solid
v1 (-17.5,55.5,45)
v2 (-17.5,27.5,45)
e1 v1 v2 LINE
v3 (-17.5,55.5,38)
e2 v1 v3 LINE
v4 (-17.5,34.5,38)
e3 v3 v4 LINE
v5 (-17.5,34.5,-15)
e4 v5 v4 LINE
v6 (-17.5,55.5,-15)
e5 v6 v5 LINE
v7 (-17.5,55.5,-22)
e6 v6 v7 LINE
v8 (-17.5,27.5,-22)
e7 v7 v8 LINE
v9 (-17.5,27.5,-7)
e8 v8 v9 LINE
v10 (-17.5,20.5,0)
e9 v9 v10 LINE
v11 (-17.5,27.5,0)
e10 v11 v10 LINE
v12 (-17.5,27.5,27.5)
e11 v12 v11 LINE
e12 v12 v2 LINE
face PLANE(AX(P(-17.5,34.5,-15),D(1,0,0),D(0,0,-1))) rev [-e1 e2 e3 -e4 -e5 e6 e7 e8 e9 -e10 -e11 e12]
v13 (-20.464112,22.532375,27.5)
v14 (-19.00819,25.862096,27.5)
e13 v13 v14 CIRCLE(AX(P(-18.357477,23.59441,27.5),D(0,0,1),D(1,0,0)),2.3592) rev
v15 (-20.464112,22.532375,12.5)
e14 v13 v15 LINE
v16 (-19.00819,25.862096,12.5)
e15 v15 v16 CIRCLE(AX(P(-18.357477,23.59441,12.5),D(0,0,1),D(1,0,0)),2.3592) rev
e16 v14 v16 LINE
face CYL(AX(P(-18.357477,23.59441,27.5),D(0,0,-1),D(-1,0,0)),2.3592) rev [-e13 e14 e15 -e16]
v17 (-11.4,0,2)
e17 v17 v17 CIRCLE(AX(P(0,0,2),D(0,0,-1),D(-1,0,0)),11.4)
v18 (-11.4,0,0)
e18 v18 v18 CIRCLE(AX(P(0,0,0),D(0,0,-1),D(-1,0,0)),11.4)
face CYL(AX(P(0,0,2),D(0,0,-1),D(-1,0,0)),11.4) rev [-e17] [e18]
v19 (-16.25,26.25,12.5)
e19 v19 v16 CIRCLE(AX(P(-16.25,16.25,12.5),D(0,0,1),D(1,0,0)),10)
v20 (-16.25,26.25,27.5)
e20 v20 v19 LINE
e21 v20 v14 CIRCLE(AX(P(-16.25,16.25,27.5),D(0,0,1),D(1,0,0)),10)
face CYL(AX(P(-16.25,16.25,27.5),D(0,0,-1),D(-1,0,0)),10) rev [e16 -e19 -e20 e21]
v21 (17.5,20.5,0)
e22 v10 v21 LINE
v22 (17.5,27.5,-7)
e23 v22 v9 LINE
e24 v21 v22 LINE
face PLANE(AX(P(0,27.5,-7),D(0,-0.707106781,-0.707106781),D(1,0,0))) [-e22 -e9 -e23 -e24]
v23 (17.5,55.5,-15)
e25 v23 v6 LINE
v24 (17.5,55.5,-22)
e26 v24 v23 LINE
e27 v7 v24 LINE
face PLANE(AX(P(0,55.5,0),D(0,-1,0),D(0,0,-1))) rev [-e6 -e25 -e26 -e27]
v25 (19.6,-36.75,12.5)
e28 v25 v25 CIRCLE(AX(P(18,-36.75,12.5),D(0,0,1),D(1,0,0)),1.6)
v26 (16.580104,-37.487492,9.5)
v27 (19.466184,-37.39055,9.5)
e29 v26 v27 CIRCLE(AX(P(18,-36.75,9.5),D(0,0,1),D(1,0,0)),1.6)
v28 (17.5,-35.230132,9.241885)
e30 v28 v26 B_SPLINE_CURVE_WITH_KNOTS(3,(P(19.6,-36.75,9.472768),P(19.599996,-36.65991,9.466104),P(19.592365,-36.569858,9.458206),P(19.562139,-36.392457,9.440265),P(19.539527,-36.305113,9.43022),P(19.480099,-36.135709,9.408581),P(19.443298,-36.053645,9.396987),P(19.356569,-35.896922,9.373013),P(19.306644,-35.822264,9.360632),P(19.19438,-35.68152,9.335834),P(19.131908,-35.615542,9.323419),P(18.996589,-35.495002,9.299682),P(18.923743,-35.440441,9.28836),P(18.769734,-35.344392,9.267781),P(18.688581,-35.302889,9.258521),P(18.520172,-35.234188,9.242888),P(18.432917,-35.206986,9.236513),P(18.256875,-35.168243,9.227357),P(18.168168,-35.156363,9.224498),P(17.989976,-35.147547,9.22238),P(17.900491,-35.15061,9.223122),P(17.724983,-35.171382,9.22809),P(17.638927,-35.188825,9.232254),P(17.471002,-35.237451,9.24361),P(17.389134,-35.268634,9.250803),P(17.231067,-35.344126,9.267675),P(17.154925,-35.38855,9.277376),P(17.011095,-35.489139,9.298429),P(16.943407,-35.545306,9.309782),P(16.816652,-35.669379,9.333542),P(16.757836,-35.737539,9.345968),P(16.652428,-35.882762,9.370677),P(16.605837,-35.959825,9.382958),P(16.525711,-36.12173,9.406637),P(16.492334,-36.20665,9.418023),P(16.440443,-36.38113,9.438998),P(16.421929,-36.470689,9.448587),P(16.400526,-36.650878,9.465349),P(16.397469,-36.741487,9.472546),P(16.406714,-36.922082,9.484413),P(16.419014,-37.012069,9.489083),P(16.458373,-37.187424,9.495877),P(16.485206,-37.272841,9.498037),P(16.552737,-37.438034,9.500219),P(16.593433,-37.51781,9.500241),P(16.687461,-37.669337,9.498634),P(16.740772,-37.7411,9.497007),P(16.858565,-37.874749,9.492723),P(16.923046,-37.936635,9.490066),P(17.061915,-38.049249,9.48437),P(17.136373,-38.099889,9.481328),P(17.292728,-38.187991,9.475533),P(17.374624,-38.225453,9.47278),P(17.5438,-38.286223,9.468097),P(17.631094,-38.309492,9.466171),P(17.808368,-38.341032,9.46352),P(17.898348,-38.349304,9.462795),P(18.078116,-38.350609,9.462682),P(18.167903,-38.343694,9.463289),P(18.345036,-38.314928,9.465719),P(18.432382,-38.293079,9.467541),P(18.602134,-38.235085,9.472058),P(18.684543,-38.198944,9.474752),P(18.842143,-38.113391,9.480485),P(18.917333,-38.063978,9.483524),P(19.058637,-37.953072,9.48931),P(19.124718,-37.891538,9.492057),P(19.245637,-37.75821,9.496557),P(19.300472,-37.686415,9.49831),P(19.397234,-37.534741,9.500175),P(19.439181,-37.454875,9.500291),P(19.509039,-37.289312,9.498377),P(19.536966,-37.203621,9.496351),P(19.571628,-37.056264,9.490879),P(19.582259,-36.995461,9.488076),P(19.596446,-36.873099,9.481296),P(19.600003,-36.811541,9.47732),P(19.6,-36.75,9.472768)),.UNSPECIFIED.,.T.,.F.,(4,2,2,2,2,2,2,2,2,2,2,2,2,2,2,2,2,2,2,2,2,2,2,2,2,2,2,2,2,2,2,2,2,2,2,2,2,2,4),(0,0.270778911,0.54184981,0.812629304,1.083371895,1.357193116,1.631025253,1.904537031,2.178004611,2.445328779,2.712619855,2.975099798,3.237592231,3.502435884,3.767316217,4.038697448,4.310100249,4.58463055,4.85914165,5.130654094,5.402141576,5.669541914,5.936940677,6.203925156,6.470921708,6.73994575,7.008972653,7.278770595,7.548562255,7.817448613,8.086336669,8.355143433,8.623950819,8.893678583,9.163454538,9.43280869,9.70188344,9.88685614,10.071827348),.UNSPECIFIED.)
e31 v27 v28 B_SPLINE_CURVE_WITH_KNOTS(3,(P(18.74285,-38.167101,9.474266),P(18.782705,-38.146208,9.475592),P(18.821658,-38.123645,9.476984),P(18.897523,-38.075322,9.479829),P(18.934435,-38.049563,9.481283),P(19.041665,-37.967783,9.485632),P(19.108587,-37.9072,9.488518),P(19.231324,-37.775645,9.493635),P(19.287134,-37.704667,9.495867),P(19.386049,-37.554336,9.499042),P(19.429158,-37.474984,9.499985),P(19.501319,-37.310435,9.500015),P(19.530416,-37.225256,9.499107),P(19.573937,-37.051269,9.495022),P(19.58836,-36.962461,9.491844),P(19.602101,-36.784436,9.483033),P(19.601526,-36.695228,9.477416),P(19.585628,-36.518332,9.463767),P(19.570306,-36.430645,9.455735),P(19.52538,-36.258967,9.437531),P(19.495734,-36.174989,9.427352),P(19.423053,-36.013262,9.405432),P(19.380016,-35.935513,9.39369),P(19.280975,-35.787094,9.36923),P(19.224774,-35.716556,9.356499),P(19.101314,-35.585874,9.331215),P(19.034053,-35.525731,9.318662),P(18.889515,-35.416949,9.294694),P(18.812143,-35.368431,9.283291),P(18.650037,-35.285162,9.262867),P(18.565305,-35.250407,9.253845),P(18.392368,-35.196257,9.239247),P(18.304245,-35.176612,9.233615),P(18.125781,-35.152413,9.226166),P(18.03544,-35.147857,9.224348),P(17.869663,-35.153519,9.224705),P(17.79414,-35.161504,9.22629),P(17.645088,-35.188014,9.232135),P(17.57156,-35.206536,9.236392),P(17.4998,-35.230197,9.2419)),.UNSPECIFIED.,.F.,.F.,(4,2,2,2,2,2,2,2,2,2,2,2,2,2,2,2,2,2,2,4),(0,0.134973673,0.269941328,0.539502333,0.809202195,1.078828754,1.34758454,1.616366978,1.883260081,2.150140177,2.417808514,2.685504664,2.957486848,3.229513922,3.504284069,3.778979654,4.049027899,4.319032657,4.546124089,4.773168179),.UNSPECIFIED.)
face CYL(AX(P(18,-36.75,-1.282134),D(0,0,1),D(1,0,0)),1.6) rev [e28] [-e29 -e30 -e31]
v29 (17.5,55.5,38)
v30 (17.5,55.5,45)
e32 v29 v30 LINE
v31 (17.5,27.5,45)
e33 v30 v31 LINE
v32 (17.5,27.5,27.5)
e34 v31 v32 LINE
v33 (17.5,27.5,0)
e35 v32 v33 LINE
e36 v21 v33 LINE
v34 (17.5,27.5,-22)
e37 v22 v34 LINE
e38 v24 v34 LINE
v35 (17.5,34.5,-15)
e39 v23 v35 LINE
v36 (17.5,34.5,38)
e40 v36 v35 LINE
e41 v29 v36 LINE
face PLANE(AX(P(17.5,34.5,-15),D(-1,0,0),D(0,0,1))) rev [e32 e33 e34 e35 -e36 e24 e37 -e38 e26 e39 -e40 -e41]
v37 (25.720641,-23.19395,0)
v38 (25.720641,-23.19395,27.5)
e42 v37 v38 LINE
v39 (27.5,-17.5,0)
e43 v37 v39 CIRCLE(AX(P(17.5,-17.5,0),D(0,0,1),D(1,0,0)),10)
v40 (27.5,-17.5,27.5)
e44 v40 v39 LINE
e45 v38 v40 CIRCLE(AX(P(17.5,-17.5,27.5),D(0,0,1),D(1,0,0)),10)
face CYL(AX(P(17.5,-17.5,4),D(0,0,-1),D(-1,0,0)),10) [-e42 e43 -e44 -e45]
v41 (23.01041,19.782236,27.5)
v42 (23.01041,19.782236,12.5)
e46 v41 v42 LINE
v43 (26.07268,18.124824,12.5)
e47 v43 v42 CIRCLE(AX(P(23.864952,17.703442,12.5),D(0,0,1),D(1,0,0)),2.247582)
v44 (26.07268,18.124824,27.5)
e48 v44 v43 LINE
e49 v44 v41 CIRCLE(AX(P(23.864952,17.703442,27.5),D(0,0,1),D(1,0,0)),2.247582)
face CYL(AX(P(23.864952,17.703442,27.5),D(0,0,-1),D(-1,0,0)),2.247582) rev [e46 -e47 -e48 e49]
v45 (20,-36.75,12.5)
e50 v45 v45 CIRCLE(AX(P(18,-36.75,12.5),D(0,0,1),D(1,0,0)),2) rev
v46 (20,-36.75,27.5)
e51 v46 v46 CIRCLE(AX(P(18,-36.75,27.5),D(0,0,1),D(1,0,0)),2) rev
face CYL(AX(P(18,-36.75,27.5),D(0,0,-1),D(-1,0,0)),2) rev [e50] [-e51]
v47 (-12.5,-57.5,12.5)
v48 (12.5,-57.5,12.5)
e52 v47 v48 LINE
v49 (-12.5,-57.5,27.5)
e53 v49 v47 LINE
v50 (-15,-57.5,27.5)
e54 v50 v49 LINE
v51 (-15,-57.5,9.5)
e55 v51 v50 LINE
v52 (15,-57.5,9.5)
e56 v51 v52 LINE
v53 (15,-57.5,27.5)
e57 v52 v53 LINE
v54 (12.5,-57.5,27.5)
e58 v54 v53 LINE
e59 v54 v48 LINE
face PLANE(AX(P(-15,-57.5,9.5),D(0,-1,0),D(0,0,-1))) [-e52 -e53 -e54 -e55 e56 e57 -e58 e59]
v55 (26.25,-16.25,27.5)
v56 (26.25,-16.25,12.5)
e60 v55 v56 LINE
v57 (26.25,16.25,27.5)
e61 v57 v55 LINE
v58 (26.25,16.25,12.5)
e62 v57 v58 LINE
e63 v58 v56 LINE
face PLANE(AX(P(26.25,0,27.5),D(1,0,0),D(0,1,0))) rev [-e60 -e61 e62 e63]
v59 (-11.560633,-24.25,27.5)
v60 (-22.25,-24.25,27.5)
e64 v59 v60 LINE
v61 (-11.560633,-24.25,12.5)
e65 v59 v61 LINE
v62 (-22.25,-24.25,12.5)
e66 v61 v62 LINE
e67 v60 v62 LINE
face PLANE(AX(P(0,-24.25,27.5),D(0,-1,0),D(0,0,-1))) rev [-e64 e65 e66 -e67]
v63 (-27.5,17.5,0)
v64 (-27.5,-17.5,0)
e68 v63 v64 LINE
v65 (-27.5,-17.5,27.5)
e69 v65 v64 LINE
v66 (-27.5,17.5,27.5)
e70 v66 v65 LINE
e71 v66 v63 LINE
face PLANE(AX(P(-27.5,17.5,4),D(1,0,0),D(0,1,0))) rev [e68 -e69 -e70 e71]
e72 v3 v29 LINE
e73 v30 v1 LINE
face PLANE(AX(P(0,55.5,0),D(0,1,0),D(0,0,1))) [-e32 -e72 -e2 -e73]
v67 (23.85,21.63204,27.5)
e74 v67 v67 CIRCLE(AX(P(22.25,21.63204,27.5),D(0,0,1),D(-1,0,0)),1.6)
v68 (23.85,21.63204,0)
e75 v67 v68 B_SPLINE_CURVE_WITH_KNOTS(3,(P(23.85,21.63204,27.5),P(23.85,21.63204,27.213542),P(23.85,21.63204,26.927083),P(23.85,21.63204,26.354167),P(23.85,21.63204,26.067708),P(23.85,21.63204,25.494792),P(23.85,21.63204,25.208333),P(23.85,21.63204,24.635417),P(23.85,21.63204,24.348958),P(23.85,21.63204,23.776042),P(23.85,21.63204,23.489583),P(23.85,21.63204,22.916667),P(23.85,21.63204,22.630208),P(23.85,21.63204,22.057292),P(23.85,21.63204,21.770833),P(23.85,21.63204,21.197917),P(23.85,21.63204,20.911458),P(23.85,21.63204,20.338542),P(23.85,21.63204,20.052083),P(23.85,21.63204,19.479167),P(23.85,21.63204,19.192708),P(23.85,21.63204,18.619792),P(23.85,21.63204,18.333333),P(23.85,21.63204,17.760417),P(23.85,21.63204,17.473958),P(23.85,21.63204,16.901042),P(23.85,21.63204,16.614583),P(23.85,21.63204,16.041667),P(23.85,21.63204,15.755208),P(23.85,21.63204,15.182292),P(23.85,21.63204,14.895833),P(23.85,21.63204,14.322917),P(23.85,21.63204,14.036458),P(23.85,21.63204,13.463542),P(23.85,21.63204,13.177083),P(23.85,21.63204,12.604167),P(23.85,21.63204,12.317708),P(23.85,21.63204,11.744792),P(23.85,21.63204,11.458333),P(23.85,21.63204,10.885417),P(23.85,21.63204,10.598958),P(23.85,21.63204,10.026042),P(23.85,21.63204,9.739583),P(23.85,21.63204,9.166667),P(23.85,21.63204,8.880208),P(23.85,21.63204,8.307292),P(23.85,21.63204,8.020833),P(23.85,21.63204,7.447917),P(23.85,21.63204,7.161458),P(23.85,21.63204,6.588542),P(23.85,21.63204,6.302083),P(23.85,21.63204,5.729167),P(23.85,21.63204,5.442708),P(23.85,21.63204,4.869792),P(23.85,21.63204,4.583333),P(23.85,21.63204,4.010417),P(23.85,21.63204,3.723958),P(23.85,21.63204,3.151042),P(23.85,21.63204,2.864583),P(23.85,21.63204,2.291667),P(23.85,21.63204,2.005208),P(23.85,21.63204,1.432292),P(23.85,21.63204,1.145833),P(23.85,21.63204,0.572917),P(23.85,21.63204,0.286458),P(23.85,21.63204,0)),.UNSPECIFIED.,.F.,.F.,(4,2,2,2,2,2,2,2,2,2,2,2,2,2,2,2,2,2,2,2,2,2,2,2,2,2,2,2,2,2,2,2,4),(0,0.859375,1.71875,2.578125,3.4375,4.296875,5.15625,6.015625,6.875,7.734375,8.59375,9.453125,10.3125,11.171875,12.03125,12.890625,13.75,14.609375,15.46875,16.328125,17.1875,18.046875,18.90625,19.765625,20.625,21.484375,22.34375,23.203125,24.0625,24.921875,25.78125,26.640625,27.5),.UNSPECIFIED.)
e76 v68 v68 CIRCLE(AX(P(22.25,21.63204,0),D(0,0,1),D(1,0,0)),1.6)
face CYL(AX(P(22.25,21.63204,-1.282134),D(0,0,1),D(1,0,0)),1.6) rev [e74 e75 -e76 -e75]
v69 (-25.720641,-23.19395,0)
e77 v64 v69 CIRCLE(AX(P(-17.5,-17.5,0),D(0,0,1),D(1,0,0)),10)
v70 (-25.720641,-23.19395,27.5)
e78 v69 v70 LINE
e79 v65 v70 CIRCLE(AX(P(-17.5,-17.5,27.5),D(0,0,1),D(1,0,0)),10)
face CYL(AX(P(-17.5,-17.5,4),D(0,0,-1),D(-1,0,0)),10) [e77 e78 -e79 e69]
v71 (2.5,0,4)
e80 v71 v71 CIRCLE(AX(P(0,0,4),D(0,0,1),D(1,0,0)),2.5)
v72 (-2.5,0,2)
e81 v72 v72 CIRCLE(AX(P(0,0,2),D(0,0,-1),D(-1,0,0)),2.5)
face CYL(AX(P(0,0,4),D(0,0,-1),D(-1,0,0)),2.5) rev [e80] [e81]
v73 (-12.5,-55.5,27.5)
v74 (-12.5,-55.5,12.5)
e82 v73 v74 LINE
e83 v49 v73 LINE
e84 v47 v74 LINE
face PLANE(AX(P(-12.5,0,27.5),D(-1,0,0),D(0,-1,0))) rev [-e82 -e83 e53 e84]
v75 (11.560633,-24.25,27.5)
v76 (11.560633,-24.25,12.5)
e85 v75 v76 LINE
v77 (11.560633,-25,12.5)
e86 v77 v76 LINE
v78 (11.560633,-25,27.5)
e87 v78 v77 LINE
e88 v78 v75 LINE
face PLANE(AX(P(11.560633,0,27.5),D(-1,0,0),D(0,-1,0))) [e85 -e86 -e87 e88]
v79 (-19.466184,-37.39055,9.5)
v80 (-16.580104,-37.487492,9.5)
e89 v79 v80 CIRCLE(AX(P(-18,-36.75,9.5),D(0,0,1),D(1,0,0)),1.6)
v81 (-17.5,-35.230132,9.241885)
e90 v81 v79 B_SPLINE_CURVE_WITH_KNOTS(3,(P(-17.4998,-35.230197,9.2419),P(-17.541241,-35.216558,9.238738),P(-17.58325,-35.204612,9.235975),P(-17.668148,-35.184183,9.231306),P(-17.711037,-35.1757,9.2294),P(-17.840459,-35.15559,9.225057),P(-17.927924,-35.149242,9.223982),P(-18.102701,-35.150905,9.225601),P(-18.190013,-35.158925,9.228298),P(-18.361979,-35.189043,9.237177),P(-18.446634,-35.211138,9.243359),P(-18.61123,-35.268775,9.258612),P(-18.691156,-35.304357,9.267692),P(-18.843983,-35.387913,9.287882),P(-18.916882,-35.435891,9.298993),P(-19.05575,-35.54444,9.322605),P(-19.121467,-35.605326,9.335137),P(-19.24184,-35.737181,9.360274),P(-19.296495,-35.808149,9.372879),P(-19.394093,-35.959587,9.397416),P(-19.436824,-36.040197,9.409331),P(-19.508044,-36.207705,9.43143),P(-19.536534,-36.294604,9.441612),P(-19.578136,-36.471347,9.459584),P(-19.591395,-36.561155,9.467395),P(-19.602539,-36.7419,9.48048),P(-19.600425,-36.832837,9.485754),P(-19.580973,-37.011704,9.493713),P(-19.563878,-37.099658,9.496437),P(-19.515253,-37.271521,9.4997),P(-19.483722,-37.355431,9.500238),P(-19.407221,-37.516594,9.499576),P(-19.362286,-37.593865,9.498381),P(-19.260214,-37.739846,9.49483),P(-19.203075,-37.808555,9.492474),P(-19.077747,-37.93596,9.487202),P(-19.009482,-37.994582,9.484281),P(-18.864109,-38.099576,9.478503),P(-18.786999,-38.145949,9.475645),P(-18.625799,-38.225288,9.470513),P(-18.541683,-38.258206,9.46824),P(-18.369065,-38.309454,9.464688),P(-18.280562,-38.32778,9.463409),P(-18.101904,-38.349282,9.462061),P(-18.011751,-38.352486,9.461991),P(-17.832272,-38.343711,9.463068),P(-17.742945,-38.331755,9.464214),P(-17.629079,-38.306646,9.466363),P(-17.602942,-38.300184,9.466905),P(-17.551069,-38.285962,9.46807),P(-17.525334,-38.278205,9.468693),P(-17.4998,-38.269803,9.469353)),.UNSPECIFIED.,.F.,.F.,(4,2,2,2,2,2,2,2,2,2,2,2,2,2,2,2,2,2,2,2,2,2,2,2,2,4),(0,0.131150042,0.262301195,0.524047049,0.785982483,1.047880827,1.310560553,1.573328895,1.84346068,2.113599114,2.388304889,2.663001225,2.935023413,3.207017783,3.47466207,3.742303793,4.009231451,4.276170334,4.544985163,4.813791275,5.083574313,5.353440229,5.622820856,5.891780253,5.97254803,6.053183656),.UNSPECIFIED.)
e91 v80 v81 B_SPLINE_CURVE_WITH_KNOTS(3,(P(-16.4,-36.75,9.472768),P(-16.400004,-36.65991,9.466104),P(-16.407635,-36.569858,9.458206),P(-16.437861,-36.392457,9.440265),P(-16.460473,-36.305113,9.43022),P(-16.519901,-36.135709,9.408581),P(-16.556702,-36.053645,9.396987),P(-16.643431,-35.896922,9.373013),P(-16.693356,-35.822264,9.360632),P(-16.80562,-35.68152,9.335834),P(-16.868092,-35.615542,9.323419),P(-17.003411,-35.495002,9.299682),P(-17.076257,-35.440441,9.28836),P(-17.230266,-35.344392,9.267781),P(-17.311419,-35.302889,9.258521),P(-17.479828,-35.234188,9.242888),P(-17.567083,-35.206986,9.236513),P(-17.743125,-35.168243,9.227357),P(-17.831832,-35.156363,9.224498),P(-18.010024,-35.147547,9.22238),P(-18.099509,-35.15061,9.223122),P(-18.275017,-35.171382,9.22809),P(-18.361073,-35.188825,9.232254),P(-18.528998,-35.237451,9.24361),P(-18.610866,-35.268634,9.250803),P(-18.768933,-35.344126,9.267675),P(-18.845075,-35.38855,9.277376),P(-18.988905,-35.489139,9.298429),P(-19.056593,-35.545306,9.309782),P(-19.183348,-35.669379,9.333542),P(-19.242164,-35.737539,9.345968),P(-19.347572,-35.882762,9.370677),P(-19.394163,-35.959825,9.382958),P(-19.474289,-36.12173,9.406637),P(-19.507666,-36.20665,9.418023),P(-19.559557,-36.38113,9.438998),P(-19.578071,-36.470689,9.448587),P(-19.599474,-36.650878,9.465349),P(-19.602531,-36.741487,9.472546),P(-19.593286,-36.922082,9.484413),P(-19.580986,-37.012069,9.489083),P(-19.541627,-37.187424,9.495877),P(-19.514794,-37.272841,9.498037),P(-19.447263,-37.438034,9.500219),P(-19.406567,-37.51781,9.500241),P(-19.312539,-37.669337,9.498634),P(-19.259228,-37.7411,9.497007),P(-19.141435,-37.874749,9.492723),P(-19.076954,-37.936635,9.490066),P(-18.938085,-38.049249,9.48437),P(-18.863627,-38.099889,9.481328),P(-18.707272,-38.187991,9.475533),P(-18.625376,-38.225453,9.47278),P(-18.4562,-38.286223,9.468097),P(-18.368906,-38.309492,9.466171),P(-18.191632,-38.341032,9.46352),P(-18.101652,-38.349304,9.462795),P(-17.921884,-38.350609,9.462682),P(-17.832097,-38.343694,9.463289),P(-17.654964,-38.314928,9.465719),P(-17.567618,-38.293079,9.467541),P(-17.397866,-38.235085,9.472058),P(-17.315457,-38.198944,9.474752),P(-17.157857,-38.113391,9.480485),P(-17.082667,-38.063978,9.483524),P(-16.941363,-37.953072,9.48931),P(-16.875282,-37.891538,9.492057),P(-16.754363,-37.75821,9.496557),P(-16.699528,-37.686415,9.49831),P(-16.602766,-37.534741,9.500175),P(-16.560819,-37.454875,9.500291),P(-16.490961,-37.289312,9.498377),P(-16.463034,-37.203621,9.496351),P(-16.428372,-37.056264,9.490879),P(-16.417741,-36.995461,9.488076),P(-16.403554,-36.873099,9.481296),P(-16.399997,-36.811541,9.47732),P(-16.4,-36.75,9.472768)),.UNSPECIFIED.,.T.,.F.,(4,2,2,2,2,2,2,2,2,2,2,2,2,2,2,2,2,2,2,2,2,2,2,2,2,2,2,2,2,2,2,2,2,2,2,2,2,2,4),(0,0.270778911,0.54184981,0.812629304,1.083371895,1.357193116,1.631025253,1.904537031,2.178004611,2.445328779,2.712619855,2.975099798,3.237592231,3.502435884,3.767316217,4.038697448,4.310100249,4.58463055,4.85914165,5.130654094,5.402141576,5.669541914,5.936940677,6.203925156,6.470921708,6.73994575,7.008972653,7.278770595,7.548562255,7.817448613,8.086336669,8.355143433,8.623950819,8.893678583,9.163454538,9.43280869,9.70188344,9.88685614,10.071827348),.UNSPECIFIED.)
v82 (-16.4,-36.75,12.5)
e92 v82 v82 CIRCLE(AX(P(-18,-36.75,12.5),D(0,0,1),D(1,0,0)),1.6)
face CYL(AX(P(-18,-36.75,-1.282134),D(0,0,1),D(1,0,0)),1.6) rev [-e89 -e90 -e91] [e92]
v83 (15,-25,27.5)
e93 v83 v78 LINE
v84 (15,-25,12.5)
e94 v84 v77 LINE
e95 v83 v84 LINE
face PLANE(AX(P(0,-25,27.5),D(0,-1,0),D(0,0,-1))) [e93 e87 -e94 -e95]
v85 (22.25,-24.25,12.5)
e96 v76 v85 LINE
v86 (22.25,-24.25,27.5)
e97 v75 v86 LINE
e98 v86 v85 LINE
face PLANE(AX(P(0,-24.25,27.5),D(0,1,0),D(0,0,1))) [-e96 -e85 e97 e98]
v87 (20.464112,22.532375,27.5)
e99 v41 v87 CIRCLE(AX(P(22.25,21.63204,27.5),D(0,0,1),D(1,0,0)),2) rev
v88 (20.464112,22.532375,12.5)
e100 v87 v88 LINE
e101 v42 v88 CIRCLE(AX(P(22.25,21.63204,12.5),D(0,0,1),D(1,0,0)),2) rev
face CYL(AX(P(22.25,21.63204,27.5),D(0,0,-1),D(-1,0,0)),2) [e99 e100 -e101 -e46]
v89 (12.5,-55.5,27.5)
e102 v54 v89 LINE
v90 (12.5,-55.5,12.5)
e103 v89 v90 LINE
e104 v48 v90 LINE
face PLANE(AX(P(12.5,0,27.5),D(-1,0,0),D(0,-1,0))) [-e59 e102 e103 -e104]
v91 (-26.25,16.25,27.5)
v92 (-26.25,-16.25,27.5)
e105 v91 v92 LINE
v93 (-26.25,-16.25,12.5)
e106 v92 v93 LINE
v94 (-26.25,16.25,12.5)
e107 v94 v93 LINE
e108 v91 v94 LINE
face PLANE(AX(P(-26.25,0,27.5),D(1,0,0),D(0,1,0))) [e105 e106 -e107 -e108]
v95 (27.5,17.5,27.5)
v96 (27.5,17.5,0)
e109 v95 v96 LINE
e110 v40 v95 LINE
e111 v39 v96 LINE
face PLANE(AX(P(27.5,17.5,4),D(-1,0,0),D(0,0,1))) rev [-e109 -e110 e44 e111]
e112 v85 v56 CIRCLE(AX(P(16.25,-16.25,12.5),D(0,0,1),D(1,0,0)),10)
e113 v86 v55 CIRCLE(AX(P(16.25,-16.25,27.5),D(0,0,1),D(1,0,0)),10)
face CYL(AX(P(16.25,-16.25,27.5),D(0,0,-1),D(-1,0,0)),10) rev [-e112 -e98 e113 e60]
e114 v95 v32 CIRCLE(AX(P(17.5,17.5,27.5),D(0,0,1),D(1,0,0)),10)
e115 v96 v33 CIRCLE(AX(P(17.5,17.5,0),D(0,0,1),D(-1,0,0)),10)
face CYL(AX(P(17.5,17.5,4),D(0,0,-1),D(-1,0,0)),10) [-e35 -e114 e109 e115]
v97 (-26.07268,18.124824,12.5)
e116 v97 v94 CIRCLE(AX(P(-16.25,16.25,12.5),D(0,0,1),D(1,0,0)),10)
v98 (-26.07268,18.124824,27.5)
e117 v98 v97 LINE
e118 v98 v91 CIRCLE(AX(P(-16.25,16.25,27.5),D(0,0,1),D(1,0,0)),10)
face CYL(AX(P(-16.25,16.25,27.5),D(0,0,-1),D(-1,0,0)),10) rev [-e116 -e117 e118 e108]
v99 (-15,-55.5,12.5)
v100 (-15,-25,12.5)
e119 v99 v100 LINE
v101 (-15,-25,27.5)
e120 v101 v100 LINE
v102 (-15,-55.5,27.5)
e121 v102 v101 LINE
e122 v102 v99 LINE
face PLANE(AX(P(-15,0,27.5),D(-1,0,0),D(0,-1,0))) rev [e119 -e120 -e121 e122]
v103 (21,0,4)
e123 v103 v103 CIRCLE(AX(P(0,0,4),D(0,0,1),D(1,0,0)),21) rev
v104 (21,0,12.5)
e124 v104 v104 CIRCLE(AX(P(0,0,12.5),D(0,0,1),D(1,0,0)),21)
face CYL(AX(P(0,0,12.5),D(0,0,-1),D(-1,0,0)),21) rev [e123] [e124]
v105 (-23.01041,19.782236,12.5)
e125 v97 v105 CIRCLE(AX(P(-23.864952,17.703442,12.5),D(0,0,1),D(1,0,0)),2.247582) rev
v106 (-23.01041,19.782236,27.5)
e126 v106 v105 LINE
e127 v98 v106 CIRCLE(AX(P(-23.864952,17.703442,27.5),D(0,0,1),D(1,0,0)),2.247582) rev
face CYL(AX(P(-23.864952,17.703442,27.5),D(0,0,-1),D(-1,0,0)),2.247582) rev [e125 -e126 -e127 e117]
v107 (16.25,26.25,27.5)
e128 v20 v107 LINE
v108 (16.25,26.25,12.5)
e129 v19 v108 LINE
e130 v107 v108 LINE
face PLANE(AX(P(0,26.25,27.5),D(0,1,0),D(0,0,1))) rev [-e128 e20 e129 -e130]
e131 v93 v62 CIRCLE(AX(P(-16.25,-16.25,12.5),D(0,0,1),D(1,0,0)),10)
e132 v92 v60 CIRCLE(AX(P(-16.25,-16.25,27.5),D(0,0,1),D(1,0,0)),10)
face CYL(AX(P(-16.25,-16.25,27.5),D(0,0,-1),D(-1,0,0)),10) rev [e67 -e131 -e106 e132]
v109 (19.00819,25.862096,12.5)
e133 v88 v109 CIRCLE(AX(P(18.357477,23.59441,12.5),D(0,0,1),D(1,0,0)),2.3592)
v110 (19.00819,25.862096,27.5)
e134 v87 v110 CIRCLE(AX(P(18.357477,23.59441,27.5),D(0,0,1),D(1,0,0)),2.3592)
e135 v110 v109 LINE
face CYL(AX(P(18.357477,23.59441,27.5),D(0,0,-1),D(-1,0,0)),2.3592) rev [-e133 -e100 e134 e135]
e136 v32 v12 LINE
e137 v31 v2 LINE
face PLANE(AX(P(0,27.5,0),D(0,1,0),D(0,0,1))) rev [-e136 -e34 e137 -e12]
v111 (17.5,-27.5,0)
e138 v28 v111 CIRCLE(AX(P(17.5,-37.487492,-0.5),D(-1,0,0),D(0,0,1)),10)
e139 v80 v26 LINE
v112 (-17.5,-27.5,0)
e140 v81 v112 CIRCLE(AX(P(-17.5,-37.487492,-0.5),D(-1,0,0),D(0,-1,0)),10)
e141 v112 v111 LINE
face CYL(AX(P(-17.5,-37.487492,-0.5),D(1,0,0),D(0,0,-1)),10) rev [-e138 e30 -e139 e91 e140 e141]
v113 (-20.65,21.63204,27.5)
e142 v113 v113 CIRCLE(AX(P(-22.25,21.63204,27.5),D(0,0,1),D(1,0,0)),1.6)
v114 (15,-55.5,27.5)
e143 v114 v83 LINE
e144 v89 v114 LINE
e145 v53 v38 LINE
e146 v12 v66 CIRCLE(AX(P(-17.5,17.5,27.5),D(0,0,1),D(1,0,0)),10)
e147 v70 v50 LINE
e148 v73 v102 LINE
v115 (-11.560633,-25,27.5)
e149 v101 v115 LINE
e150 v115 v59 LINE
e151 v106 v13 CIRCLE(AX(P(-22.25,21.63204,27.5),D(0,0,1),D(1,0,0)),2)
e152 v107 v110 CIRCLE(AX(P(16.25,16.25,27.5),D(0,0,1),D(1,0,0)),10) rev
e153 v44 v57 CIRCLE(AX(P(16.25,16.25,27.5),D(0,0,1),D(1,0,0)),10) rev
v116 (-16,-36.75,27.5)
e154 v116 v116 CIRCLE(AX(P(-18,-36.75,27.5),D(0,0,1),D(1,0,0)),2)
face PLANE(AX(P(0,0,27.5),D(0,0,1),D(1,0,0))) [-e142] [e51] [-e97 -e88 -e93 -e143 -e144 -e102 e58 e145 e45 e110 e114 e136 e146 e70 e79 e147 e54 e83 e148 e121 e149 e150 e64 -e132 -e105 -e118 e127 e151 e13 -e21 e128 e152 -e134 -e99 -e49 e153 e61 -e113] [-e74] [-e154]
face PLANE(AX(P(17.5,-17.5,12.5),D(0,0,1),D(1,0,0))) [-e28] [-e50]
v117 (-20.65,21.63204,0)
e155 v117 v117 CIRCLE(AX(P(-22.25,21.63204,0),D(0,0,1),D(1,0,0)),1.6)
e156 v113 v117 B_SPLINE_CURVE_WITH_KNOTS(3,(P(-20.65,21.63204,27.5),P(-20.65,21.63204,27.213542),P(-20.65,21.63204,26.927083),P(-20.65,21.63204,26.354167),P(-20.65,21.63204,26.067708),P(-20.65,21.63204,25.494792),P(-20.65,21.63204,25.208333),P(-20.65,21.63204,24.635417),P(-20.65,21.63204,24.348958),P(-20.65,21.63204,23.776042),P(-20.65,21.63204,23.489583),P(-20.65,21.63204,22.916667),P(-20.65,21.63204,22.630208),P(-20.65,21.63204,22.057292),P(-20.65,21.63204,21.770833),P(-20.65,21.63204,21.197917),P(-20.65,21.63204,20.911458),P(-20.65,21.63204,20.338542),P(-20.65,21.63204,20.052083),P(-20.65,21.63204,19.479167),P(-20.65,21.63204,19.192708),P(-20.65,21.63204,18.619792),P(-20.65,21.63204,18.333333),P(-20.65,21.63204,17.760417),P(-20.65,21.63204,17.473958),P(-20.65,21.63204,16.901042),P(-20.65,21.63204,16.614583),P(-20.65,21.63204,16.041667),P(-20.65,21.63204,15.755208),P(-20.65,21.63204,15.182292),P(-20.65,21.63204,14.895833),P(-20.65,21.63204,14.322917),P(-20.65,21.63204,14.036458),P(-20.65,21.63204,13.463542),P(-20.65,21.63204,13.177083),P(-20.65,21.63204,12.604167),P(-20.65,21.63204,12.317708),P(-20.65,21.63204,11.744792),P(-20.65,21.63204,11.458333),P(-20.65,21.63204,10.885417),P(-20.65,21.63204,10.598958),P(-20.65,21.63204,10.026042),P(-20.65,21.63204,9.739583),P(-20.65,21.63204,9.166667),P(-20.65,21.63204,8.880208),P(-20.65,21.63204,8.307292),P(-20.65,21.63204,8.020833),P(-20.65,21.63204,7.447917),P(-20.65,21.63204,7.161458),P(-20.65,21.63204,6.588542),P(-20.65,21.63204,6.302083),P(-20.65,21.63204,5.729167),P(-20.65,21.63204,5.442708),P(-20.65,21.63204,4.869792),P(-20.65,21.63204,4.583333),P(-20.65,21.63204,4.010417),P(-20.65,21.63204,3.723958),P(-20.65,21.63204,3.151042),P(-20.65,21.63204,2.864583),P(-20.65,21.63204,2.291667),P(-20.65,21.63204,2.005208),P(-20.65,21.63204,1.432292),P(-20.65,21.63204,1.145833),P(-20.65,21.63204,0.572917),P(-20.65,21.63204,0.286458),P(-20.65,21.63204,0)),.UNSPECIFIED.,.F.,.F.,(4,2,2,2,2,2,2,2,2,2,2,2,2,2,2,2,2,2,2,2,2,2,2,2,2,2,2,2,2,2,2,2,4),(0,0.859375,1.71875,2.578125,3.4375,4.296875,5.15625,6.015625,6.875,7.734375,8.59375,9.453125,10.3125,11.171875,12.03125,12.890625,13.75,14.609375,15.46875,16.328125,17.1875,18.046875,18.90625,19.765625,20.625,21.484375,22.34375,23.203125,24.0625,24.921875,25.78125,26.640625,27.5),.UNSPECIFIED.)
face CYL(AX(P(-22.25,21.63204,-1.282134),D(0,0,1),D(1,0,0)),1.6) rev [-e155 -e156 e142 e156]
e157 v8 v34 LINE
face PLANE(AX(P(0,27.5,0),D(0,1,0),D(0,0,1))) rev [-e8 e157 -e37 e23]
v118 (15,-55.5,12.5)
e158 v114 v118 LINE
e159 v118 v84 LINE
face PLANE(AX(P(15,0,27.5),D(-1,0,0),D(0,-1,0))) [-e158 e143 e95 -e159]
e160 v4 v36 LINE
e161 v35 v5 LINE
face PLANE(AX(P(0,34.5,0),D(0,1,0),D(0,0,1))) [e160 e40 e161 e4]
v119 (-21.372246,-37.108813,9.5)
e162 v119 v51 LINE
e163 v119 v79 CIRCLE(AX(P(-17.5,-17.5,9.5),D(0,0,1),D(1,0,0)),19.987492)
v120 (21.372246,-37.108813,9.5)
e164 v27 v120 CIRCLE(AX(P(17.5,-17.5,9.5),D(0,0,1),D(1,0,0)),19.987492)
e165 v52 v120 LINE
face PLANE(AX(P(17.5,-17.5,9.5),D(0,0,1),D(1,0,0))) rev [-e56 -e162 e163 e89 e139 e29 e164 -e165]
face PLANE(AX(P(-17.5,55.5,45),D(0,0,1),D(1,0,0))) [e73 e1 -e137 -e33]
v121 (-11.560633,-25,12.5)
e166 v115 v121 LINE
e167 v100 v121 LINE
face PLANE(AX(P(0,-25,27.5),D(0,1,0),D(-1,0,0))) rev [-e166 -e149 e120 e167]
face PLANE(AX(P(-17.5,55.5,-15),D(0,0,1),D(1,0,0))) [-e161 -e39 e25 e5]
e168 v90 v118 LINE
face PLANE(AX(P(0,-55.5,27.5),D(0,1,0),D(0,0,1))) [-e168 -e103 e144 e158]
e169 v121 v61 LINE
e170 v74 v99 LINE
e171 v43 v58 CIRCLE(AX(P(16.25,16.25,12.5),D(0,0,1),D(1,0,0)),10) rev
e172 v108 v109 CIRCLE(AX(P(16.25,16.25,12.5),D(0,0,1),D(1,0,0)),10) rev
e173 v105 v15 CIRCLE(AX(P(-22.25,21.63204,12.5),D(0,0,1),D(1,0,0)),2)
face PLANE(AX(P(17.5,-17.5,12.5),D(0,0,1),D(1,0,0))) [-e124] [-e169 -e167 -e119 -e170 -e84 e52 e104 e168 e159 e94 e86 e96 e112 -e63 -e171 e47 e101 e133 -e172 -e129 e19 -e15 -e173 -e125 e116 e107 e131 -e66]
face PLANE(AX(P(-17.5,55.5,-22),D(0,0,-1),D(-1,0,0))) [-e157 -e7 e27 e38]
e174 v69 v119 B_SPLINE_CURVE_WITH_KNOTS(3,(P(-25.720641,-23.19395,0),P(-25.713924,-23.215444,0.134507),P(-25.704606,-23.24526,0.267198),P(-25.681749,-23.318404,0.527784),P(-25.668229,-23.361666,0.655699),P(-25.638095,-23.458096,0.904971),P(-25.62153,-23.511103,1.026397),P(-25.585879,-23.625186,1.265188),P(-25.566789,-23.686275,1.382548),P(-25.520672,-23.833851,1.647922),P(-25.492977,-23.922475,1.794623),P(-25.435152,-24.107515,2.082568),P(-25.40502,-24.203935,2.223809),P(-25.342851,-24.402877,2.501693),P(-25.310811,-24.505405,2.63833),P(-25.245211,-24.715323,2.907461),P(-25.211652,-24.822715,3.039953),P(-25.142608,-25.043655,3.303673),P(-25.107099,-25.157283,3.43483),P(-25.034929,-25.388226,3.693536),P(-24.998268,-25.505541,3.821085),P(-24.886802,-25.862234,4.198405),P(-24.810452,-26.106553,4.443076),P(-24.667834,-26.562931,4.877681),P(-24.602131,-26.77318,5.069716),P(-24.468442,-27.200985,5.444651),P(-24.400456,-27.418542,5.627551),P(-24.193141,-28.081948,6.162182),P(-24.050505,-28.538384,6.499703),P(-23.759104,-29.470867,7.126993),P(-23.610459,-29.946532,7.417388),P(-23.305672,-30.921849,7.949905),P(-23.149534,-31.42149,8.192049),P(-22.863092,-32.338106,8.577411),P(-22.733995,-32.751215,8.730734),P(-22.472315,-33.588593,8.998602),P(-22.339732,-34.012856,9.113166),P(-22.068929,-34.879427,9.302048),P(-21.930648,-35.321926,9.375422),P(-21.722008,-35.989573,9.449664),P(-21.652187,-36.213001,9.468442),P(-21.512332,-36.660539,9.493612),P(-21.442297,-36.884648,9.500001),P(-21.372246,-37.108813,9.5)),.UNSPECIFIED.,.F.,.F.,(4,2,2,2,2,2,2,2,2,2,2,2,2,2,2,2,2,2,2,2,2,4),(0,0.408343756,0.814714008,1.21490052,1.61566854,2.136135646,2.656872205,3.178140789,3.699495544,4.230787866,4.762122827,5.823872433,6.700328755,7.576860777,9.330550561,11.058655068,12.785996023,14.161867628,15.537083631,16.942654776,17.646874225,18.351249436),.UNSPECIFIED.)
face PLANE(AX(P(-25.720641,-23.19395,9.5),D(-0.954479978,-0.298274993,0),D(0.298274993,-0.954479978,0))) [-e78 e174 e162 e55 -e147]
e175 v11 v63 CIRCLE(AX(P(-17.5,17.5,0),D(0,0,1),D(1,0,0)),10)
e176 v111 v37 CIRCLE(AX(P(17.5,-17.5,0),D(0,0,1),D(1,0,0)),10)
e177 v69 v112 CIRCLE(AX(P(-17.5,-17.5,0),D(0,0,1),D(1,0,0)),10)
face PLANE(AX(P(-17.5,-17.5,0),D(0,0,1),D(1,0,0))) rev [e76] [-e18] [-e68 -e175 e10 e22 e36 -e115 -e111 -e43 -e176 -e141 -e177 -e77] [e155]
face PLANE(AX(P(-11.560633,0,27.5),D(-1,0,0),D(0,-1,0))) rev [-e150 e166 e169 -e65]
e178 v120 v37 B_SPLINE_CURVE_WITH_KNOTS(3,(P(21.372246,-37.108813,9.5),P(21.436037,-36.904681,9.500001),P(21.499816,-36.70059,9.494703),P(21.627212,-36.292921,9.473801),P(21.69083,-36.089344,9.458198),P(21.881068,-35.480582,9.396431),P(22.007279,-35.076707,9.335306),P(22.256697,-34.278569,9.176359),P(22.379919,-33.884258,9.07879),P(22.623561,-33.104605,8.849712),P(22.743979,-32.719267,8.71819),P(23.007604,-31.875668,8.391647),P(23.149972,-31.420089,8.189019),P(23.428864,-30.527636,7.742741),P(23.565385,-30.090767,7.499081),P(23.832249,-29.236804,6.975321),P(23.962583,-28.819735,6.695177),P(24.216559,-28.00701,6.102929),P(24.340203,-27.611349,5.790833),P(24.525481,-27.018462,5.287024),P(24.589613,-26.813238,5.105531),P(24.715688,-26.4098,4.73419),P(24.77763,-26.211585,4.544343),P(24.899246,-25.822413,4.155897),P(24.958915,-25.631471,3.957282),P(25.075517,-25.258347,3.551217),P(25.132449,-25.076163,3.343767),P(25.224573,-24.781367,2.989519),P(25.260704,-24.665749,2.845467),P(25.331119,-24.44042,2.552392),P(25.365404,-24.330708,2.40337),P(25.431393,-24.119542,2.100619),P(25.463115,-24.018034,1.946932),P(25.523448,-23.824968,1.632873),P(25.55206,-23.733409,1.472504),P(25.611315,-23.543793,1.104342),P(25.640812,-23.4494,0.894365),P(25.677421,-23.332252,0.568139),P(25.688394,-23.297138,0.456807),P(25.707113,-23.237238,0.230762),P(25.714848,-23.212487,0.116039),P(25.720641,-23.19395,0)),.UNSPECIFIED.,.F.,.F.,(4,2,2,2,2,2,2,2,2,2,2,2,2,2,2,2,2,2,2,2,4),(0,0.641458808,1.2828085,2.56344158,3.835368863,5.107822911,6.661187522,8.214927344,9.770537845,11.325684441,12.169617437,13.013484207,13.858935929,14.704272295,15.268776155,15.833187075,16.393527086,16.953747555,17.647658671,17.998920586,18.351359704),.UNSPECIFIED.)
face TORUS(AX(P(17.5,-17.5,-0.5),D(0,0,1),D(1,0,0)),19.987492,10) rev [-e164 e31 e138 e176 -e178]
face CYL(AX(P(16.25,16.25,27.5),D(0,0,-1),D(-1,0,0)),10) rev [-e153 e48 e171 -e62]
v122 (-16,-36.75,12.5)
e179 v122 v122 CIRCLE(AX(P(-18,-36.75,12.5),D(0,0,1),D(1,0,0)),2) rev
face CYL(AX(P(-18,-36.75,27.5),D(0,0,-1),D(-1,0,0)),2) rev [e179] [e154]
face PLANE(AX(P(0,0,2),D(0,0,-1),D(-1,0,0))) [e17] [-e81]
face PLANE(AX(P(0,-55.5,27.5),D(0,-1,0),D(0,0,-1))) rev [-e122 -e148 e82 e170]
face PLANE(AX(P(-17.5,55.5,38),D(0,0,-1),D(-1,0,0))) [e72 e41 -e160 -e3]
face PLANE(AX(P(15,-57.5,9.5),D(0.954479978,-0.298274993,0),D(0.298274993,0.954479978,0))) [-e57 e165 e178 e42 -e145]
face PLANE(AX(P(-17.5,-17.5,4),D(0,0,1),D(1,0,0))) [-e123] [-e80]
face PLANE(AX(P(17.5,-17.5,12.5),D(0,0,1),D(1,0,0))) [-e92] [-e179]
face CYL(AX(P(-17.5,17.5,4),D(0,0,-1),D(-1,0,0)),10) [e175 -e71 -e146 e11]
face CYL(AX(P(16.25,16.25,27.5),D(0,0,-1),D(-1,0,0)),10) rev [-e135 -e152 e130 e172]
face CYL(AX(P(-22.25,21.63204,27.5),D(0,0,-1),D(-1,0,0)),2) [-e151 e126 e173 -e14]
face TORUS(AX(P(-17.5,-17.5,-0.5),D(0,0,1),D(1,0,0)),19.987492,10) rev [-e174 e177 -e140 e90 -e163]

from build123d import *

# Parameters (mm, degrees)
CROQUIS4_R                  = 2.5
SALIENTE_EXTRUIR1_DEPTH     = 4
CROQUIS5_R                  = 21
SALIENTE_EXTRUIR2_DEPTH     = 8.5
SALIENTE_EXTRUIR4_START     = -3
SALIENTE_EXTRUIR4_DEPTH     = 3
REDONDEO1_R                 = 10
SALIENTE_EXTRUIR5_OUTLINE_R = 2
SALIENTE_EXTRUIR5_DEPTH     = 15
CROQUIS9_R                  = 1.6
CORTAR_EXTRUIR1_DEPTH       = 70.417217007
CROQUIS11_W                 = 35
CROQUIS11_H                 = 53
SALIENTE_EXTRUIR7_DEPTH     = 7
CROQUIS12_W                 = 35
CROQUIS12_H                 = 7
SALIENTE_EXTRUIR8_DEPTH     = 28
CHAFL_N2_SIZE               = 7
CROQUIS13_R                 = 11.4
CORTAR_EXTRUIR2_DEPTH       = 2


# Read off the part's stored shape, not the designer's step: Saliente-Extruir5
with BuildPart() as part:
    # Croquis4 → Saliente-Extruir1 (new body)
    with BuildSketch(Plane.XY):
        with BuildLine():
            Line((-17.5, 27.5), (17.5, 27.5))
            ThreePointArc((17.5, 27.5), (24.571067812, 24.571067812), (27.5, 17.5))
            Line((27.5, 17.5), (27.5, -17.5))
            ThreePointArc((27.5, -17.5), (24.571067812, -24.571067812), (17.5, -27.5))
            Line((17.5, -27.5), (-17.5, -27.5))
            ThreePointArc((-17.5, -27.5), (-24.571067812, -24.571067812), (-27.5, -17.5))
            Line((-27.5, -17.5), (-27.5, 17.5))
            ThreePointArc((-27.5, 17.5), (-24.571067812, 24.571067812), (-17.5, 27.5))
        make_face()
        Circle(CROQUIS4_R, mode=Mode.SUBTRACT)
    extrude(amount=SALIENTE_EXTRUIR1_DEPTH)

    # Croquis5 → Saliente-Extruir2 (add)
    with BuildSketch(Plane.XY.offset(4)):
        with BuildLine():
            Line((-17.5, 27.5), (17.5, 27.5))
            ThreePointArc((17.5, 27.5), (24.571067812, 24.571067812), (27.5, 17.5))
            Line((27.5, 17.5), (27.5, -17.5))
            ThreePointArc((27.5, -17.5), (24.571067812, -24.571067812), (17.5, -27.5))
            Line((17.5, -27.5), (-17.5, -27.5))
            ThreePointArc((-17.5, -27.5), (-24.571067812, -24.571067812), (-27.5, -17.5))
            Line((-27.5, -17.5), (-27.5, 17.5))
            ThreePointArc((-27.5, 17.5), (-24.571067812, 24.571067812), (-17.5, 27.5))
        make_face()
        Circle(CROQUIS5_R, mode=Mode.SUBTRACT)
    extrude(amount=SALIENTE_EXTRUIR2_DEPTH)

    # Croquis6 → Saliente-Extruir4 (add)
    with BuildSketch(Plane.XY.offset(12.5).offset(SALIENTE_EXTRUIR4_START)):
        with BuildLine():
            Line((-25.720640569, -23.193950178), (-15, -57.5))
            Line((-15, -57.5), (15, -57.5))
            Line((15, -57.5), (25.720640569, -23.193950178))
            ThreePointArc((25.720640569, -23.193950178), (22.140069947, -26.358315353), (17.5, -27.5))
            Line((17.5, -27.5), (-17.5, -27.5))
            ThreePointArc((-17.5, -27.5), (-22.140069947, -26.358315353), (-25.720640569, -23.193950178))
        make_face()
    extrude(amount=SALIENTE_EXTRUIR4_DEPTH)

    # Redondeo1
    # the kernel refuses this fillet: 10 mm, written as the material it adds along each edge
    with BuildSketch(Plane(origin=(17.5, -17.5, 9.5), x_dir=(-0.31521717271258337, 0.949019564617656, 0), z_dir=(-0.949019564617656, -0.31521717271258337, 0))) as redondeo1_piece_1_section:
        with BuildLine():
            CenterArc((19.987492178, 10), REDONDEO1_R, 182.865983983, 87.134016017)
            Line((19.987492178, 0), (10, 0))
            Line((10, 0), (10, 9.5))
        make_face()
    redondeo1_piece_1 = revolve(axis=Axis((17.5, -17.5, 9.5), (0, 0, -1)), revolution_arc=198.373924806, mode=Mode.PRIVATE)
    redondeo1_piece_1 = split(redondeo1_piece_1, bisect_by=Plane(origin=(27.5, -26.624186886, 2.060383814), z_dir=(-1, 0, 0)), keep=Keep.TOP, mode=Mode.PRIVATE)
    redondeo1_piece_1 = redondeo1_piece_1 - Plane(origin=(0, 0, 2.060383814), x_dir=(1, 0, 0), z_dir=(0, 0, -1)) * Cylinder(21, 80, mode=Mode.PRIVATE)
    redondeo1_piece_1 = split(redondeo1_piece_1, bisect_by=Plane(origin=(24.437894836, -27.298736526, 2.060383814), z_dir=(-0.9544799780350299, 0.2982749931359464, 0)), keep=Keep.TOP, mode=Mode.PRIVATE)
    add(redondeo1_piece_1)
    with BuildSketch(Plane(origin=(-17.5, -17.5, 9.5), x_dir=(0, -1, 0), z_dir=(1, 0, 0))) as redondeo1_piece_2_section:
        with BuildLine():
            CenterArc((19.987492178, 10), REDONDEO1_R, 182.865983983, 87.134016017)
            Line((19.987492178, 0), (10, 0))
            Line((10, 0), (10, 9.5))
        make_face()
    redondeo1_piece_2 = revolve(axis=Axis((-17.5, -17.5, 9.5), (0, 0, -1)), revolution_arc=198.373924806, mode=Mode.PRIVATE)
    redondeo1_piece_2 = split(redondeo1_piece_2, bisect_by=Plane(origin=(-27.5, -26.624186886, 2.060383814), z_dir=(1, 0, 0)), keep=Keep.TOP, mode=Mode.PRIVATE)
    redondeo1_piece_2 = redondeo1_piece_2 - Plane(origin=(0, 0, 2.060383814), x_dir=(1, 0, 0), z_dir=(0, 0, -1)) * Cylinder(21, 80, mode=Mode.PRIVATE)
    redondeo1_piece_2 = split(redondeo1_piece_2, bisect_by=Plane(origin=(-24.437894836, -27.298736526, 2.060383814), z_dir=(0.9544799780350299, 0.29827499313594635, 0)), keep=Keep.TOP, mode=Mode.PRIVATE)
    add(redondeo1_piece_2)
    with BuildSketch(Plane(origin=(17.5, -27.5, 9.5), x_dir=(0, 0, -1), z_dir=(-1, 0, 0))) as redondeo1_piece_3:
        with BuildLine():
            CenterArc((10, 9.987492178), REDONDEO1_R, 180, 87.134016017)
            Line((0, 9.987492178), (0, 0))
            Line((0, 0), (9.5, 0))
        make_face()
    extrude(amount=35)

    # Saliente-Extruir5 outline → Saliente-Extruir5 (add)
    with BuildSketch(Plane.XY.offset(12.5)):
        with BuildLine():
            ThreePointArc((-27.5, -17.5), (-27.04479978, -20.482749931), (-25.720640569, -23.193950178))
            Line((-25.720640569, -23.193950178), (-15, -57.5))
            Line((-15, -57.5), (-12.5, -57.5))
            Line((-12.5, -57.5), (-12.5, -55.5))
            Line((-12.5, -55.5), (-15, -55.5))
            Line((-15, -55.5), (-15, -25))
            Line((-15, -25), (-11.560632513, -25))
            Line((-11.560632513, -25), (-11.560632513, -24.25))
            Line((-11.560632513, -24.25), (-22.25, -24.25))
            ThreePointArc((-22.25, -24.25), (-25.19427191, -20.722135955), (-26.25, -16.25))
            Line((-26.25, -16.25), (-26.25, 16.25))
            ThreePointArc((-26.25, 16.25), (-26.205571214, 17.191595354), (-26.072679638, 18.12482392))
            ThreePointArc((-26.072679638, 18.12482392), (-24.934779512, 19.680078923), (-23.010409798, 19.782235789))
            ThreePointArc((-23.010409798, 19.782235789), (-20.782444846, 20.273260806), (-20.464111601, 22.532375088))
            ThreePointArc((-20.464111601, 22.532375088), (-20.519074057, 24.539569231), (-19.008189542, 25.862096049))
            ThreePointArc((-19.008189542, 25.862096049), (-17.64266642, 26.152549179), (-16.25, 26.25))
            Line((-16.25, 26.25), (16.25, 26.25))
            ThreePointArc((16.25, 26.25), (17.64266642, 26.152549179), (19.008189542, 25.862096049))
            ThreePointArc((19.008189542, 25.862096049), (20.519074057, 24.539569231), (20.464111601, 22.532375088))
            ThreePointArc((20.464111601, 22.532375088), (20.782444846, 20.273260806), (23.010409798, 19.782235789))
            ThreePointArc((23.010409798, 19.782235789), (24.934779512, 19.680078923), (26.072679638, 18.12482392))
            ThreePointArc((26.072679638, 18.12482392), (26.205571214, 17.191595354), (26.25, 16.25))
            Line((26.25, 16.25), (26.25, -16.25))
            ThreePointArc((26.25, -16.25), (25.19427191, -20.722135955), (22.25, -24.25))
            Line((22.25, -24.25), (11.560632513, -24.25))
            Line((11.560632513, -24.25), (11.560632513, -25))
            Line((11.560632513, -25), (15, -25))
            Line((15, -25), (15, -55.5))
            Line((15, -55.5), (12.5, -55.5))
            Line((12.5, -55.5), (12.5, -57.5))
            Line((12.5, -57.5), (15, -57.5))
            Line((15, -57.5), (25.720640569, -23.193950178))
            ThreePointArc((25.720640569, -23.193950178), (27.04479978, -20.482749931), (27.5, -17.5))
            Line((27.5, -17.5), (27.5, 17.5))
            ThreePointArc((27.5, 17.5), (24.571067812, 24.571067812), (17.5, 27.5))
            Line((17.5, 27.5), (-17.5, 27.5))
            ThreePointArc((-17.5, 27.5), (-24.571067812, 24.571067812), (-27.5, 17.5))
            Line((-27.5, 17.5), (-27.5, -17.5))
        make_face()
        with Locations((-18, -36.75)):
            Circle(SALIENTE_EXTRUIR5_OUTLINE_R, mode=Mode.SUBTRACT)
        with Locations((18, -36.75)):
            Circle(SALIENTE_EXTRUIR5_OUTLINE_R, mode=Mode.SUBTRACT)
    extrude(amount=SALIENTE_EXTRUIR5_DEPTH)

    # Croquis9 → Cortar-Extruir1 (cut, through all)
    with BuildSketch(Plane.XY.offset(27.5)):
        with Locations((-22.25, 21.632040357)):
            Circle(CROQUIS9_R)
        with Locations((-18, -36.75)):
            Circle(CROQUIS9_R)
        with Locations((18, -36.75)):
            Circle(CROQUIS9_R)
        with Locations((22.25, 21.632040357)):
            Circle(CROQUIS9_R)
    extrude(amount=-CORTAR_EXTRUIR1_DEPTH, mode=Mode.SUBTRACT)

    # Croquis11 → Saliente-Extruir7 (add)
    with BuildSketch(Plane(origin=(0, 27.5, 0), x_dir=(1, 0, 0), z_dir=(0, 1, 0))):
        with Locations((0, -11.5)):
            Rectangle(CROQUIS11_W, CROQUIS11_H)
    extrude(amount=SALIENTE_EXTRUIR7_DEPTH)

    # Croquis12 → Saliente-Extruir8 (add)
    with BuildSketch(Plane.XZ.offset(-27.5)):
        with Locations((0, 41.5)):
            Rectangle(CROQUIS12_W, CROQUIS12_H)
        with Locations((0, -18.5)):
            Rectangle(CROQUIS12_W, CROQUIS12_H)
    extrude(amount=-SALIENTE_EXTRUIR8_DEPTH)

    # Chaflán2
    chafl_n2_edges = [part.edges().sort_by_distance(p)[0] for p in [
        (0, 27.5, 0),
    ]]
    chamfer(chafl_n2_edges, length=CHAFL_N2_SIZE)

    # Croquis13 → Cortar-Extruir2 (cut)
    with BuildSketch(Plane(origin=(0, 0, 0), x_dir=(-1, 0, 0), z_dir=(0, 0, -1))):
        Circle(CROQUIS13_R)
    extrude(amount=-CORTAR_EXTRUIR2_DEPTH, mode=Mode.SUBTRACT)


solid = part.part
